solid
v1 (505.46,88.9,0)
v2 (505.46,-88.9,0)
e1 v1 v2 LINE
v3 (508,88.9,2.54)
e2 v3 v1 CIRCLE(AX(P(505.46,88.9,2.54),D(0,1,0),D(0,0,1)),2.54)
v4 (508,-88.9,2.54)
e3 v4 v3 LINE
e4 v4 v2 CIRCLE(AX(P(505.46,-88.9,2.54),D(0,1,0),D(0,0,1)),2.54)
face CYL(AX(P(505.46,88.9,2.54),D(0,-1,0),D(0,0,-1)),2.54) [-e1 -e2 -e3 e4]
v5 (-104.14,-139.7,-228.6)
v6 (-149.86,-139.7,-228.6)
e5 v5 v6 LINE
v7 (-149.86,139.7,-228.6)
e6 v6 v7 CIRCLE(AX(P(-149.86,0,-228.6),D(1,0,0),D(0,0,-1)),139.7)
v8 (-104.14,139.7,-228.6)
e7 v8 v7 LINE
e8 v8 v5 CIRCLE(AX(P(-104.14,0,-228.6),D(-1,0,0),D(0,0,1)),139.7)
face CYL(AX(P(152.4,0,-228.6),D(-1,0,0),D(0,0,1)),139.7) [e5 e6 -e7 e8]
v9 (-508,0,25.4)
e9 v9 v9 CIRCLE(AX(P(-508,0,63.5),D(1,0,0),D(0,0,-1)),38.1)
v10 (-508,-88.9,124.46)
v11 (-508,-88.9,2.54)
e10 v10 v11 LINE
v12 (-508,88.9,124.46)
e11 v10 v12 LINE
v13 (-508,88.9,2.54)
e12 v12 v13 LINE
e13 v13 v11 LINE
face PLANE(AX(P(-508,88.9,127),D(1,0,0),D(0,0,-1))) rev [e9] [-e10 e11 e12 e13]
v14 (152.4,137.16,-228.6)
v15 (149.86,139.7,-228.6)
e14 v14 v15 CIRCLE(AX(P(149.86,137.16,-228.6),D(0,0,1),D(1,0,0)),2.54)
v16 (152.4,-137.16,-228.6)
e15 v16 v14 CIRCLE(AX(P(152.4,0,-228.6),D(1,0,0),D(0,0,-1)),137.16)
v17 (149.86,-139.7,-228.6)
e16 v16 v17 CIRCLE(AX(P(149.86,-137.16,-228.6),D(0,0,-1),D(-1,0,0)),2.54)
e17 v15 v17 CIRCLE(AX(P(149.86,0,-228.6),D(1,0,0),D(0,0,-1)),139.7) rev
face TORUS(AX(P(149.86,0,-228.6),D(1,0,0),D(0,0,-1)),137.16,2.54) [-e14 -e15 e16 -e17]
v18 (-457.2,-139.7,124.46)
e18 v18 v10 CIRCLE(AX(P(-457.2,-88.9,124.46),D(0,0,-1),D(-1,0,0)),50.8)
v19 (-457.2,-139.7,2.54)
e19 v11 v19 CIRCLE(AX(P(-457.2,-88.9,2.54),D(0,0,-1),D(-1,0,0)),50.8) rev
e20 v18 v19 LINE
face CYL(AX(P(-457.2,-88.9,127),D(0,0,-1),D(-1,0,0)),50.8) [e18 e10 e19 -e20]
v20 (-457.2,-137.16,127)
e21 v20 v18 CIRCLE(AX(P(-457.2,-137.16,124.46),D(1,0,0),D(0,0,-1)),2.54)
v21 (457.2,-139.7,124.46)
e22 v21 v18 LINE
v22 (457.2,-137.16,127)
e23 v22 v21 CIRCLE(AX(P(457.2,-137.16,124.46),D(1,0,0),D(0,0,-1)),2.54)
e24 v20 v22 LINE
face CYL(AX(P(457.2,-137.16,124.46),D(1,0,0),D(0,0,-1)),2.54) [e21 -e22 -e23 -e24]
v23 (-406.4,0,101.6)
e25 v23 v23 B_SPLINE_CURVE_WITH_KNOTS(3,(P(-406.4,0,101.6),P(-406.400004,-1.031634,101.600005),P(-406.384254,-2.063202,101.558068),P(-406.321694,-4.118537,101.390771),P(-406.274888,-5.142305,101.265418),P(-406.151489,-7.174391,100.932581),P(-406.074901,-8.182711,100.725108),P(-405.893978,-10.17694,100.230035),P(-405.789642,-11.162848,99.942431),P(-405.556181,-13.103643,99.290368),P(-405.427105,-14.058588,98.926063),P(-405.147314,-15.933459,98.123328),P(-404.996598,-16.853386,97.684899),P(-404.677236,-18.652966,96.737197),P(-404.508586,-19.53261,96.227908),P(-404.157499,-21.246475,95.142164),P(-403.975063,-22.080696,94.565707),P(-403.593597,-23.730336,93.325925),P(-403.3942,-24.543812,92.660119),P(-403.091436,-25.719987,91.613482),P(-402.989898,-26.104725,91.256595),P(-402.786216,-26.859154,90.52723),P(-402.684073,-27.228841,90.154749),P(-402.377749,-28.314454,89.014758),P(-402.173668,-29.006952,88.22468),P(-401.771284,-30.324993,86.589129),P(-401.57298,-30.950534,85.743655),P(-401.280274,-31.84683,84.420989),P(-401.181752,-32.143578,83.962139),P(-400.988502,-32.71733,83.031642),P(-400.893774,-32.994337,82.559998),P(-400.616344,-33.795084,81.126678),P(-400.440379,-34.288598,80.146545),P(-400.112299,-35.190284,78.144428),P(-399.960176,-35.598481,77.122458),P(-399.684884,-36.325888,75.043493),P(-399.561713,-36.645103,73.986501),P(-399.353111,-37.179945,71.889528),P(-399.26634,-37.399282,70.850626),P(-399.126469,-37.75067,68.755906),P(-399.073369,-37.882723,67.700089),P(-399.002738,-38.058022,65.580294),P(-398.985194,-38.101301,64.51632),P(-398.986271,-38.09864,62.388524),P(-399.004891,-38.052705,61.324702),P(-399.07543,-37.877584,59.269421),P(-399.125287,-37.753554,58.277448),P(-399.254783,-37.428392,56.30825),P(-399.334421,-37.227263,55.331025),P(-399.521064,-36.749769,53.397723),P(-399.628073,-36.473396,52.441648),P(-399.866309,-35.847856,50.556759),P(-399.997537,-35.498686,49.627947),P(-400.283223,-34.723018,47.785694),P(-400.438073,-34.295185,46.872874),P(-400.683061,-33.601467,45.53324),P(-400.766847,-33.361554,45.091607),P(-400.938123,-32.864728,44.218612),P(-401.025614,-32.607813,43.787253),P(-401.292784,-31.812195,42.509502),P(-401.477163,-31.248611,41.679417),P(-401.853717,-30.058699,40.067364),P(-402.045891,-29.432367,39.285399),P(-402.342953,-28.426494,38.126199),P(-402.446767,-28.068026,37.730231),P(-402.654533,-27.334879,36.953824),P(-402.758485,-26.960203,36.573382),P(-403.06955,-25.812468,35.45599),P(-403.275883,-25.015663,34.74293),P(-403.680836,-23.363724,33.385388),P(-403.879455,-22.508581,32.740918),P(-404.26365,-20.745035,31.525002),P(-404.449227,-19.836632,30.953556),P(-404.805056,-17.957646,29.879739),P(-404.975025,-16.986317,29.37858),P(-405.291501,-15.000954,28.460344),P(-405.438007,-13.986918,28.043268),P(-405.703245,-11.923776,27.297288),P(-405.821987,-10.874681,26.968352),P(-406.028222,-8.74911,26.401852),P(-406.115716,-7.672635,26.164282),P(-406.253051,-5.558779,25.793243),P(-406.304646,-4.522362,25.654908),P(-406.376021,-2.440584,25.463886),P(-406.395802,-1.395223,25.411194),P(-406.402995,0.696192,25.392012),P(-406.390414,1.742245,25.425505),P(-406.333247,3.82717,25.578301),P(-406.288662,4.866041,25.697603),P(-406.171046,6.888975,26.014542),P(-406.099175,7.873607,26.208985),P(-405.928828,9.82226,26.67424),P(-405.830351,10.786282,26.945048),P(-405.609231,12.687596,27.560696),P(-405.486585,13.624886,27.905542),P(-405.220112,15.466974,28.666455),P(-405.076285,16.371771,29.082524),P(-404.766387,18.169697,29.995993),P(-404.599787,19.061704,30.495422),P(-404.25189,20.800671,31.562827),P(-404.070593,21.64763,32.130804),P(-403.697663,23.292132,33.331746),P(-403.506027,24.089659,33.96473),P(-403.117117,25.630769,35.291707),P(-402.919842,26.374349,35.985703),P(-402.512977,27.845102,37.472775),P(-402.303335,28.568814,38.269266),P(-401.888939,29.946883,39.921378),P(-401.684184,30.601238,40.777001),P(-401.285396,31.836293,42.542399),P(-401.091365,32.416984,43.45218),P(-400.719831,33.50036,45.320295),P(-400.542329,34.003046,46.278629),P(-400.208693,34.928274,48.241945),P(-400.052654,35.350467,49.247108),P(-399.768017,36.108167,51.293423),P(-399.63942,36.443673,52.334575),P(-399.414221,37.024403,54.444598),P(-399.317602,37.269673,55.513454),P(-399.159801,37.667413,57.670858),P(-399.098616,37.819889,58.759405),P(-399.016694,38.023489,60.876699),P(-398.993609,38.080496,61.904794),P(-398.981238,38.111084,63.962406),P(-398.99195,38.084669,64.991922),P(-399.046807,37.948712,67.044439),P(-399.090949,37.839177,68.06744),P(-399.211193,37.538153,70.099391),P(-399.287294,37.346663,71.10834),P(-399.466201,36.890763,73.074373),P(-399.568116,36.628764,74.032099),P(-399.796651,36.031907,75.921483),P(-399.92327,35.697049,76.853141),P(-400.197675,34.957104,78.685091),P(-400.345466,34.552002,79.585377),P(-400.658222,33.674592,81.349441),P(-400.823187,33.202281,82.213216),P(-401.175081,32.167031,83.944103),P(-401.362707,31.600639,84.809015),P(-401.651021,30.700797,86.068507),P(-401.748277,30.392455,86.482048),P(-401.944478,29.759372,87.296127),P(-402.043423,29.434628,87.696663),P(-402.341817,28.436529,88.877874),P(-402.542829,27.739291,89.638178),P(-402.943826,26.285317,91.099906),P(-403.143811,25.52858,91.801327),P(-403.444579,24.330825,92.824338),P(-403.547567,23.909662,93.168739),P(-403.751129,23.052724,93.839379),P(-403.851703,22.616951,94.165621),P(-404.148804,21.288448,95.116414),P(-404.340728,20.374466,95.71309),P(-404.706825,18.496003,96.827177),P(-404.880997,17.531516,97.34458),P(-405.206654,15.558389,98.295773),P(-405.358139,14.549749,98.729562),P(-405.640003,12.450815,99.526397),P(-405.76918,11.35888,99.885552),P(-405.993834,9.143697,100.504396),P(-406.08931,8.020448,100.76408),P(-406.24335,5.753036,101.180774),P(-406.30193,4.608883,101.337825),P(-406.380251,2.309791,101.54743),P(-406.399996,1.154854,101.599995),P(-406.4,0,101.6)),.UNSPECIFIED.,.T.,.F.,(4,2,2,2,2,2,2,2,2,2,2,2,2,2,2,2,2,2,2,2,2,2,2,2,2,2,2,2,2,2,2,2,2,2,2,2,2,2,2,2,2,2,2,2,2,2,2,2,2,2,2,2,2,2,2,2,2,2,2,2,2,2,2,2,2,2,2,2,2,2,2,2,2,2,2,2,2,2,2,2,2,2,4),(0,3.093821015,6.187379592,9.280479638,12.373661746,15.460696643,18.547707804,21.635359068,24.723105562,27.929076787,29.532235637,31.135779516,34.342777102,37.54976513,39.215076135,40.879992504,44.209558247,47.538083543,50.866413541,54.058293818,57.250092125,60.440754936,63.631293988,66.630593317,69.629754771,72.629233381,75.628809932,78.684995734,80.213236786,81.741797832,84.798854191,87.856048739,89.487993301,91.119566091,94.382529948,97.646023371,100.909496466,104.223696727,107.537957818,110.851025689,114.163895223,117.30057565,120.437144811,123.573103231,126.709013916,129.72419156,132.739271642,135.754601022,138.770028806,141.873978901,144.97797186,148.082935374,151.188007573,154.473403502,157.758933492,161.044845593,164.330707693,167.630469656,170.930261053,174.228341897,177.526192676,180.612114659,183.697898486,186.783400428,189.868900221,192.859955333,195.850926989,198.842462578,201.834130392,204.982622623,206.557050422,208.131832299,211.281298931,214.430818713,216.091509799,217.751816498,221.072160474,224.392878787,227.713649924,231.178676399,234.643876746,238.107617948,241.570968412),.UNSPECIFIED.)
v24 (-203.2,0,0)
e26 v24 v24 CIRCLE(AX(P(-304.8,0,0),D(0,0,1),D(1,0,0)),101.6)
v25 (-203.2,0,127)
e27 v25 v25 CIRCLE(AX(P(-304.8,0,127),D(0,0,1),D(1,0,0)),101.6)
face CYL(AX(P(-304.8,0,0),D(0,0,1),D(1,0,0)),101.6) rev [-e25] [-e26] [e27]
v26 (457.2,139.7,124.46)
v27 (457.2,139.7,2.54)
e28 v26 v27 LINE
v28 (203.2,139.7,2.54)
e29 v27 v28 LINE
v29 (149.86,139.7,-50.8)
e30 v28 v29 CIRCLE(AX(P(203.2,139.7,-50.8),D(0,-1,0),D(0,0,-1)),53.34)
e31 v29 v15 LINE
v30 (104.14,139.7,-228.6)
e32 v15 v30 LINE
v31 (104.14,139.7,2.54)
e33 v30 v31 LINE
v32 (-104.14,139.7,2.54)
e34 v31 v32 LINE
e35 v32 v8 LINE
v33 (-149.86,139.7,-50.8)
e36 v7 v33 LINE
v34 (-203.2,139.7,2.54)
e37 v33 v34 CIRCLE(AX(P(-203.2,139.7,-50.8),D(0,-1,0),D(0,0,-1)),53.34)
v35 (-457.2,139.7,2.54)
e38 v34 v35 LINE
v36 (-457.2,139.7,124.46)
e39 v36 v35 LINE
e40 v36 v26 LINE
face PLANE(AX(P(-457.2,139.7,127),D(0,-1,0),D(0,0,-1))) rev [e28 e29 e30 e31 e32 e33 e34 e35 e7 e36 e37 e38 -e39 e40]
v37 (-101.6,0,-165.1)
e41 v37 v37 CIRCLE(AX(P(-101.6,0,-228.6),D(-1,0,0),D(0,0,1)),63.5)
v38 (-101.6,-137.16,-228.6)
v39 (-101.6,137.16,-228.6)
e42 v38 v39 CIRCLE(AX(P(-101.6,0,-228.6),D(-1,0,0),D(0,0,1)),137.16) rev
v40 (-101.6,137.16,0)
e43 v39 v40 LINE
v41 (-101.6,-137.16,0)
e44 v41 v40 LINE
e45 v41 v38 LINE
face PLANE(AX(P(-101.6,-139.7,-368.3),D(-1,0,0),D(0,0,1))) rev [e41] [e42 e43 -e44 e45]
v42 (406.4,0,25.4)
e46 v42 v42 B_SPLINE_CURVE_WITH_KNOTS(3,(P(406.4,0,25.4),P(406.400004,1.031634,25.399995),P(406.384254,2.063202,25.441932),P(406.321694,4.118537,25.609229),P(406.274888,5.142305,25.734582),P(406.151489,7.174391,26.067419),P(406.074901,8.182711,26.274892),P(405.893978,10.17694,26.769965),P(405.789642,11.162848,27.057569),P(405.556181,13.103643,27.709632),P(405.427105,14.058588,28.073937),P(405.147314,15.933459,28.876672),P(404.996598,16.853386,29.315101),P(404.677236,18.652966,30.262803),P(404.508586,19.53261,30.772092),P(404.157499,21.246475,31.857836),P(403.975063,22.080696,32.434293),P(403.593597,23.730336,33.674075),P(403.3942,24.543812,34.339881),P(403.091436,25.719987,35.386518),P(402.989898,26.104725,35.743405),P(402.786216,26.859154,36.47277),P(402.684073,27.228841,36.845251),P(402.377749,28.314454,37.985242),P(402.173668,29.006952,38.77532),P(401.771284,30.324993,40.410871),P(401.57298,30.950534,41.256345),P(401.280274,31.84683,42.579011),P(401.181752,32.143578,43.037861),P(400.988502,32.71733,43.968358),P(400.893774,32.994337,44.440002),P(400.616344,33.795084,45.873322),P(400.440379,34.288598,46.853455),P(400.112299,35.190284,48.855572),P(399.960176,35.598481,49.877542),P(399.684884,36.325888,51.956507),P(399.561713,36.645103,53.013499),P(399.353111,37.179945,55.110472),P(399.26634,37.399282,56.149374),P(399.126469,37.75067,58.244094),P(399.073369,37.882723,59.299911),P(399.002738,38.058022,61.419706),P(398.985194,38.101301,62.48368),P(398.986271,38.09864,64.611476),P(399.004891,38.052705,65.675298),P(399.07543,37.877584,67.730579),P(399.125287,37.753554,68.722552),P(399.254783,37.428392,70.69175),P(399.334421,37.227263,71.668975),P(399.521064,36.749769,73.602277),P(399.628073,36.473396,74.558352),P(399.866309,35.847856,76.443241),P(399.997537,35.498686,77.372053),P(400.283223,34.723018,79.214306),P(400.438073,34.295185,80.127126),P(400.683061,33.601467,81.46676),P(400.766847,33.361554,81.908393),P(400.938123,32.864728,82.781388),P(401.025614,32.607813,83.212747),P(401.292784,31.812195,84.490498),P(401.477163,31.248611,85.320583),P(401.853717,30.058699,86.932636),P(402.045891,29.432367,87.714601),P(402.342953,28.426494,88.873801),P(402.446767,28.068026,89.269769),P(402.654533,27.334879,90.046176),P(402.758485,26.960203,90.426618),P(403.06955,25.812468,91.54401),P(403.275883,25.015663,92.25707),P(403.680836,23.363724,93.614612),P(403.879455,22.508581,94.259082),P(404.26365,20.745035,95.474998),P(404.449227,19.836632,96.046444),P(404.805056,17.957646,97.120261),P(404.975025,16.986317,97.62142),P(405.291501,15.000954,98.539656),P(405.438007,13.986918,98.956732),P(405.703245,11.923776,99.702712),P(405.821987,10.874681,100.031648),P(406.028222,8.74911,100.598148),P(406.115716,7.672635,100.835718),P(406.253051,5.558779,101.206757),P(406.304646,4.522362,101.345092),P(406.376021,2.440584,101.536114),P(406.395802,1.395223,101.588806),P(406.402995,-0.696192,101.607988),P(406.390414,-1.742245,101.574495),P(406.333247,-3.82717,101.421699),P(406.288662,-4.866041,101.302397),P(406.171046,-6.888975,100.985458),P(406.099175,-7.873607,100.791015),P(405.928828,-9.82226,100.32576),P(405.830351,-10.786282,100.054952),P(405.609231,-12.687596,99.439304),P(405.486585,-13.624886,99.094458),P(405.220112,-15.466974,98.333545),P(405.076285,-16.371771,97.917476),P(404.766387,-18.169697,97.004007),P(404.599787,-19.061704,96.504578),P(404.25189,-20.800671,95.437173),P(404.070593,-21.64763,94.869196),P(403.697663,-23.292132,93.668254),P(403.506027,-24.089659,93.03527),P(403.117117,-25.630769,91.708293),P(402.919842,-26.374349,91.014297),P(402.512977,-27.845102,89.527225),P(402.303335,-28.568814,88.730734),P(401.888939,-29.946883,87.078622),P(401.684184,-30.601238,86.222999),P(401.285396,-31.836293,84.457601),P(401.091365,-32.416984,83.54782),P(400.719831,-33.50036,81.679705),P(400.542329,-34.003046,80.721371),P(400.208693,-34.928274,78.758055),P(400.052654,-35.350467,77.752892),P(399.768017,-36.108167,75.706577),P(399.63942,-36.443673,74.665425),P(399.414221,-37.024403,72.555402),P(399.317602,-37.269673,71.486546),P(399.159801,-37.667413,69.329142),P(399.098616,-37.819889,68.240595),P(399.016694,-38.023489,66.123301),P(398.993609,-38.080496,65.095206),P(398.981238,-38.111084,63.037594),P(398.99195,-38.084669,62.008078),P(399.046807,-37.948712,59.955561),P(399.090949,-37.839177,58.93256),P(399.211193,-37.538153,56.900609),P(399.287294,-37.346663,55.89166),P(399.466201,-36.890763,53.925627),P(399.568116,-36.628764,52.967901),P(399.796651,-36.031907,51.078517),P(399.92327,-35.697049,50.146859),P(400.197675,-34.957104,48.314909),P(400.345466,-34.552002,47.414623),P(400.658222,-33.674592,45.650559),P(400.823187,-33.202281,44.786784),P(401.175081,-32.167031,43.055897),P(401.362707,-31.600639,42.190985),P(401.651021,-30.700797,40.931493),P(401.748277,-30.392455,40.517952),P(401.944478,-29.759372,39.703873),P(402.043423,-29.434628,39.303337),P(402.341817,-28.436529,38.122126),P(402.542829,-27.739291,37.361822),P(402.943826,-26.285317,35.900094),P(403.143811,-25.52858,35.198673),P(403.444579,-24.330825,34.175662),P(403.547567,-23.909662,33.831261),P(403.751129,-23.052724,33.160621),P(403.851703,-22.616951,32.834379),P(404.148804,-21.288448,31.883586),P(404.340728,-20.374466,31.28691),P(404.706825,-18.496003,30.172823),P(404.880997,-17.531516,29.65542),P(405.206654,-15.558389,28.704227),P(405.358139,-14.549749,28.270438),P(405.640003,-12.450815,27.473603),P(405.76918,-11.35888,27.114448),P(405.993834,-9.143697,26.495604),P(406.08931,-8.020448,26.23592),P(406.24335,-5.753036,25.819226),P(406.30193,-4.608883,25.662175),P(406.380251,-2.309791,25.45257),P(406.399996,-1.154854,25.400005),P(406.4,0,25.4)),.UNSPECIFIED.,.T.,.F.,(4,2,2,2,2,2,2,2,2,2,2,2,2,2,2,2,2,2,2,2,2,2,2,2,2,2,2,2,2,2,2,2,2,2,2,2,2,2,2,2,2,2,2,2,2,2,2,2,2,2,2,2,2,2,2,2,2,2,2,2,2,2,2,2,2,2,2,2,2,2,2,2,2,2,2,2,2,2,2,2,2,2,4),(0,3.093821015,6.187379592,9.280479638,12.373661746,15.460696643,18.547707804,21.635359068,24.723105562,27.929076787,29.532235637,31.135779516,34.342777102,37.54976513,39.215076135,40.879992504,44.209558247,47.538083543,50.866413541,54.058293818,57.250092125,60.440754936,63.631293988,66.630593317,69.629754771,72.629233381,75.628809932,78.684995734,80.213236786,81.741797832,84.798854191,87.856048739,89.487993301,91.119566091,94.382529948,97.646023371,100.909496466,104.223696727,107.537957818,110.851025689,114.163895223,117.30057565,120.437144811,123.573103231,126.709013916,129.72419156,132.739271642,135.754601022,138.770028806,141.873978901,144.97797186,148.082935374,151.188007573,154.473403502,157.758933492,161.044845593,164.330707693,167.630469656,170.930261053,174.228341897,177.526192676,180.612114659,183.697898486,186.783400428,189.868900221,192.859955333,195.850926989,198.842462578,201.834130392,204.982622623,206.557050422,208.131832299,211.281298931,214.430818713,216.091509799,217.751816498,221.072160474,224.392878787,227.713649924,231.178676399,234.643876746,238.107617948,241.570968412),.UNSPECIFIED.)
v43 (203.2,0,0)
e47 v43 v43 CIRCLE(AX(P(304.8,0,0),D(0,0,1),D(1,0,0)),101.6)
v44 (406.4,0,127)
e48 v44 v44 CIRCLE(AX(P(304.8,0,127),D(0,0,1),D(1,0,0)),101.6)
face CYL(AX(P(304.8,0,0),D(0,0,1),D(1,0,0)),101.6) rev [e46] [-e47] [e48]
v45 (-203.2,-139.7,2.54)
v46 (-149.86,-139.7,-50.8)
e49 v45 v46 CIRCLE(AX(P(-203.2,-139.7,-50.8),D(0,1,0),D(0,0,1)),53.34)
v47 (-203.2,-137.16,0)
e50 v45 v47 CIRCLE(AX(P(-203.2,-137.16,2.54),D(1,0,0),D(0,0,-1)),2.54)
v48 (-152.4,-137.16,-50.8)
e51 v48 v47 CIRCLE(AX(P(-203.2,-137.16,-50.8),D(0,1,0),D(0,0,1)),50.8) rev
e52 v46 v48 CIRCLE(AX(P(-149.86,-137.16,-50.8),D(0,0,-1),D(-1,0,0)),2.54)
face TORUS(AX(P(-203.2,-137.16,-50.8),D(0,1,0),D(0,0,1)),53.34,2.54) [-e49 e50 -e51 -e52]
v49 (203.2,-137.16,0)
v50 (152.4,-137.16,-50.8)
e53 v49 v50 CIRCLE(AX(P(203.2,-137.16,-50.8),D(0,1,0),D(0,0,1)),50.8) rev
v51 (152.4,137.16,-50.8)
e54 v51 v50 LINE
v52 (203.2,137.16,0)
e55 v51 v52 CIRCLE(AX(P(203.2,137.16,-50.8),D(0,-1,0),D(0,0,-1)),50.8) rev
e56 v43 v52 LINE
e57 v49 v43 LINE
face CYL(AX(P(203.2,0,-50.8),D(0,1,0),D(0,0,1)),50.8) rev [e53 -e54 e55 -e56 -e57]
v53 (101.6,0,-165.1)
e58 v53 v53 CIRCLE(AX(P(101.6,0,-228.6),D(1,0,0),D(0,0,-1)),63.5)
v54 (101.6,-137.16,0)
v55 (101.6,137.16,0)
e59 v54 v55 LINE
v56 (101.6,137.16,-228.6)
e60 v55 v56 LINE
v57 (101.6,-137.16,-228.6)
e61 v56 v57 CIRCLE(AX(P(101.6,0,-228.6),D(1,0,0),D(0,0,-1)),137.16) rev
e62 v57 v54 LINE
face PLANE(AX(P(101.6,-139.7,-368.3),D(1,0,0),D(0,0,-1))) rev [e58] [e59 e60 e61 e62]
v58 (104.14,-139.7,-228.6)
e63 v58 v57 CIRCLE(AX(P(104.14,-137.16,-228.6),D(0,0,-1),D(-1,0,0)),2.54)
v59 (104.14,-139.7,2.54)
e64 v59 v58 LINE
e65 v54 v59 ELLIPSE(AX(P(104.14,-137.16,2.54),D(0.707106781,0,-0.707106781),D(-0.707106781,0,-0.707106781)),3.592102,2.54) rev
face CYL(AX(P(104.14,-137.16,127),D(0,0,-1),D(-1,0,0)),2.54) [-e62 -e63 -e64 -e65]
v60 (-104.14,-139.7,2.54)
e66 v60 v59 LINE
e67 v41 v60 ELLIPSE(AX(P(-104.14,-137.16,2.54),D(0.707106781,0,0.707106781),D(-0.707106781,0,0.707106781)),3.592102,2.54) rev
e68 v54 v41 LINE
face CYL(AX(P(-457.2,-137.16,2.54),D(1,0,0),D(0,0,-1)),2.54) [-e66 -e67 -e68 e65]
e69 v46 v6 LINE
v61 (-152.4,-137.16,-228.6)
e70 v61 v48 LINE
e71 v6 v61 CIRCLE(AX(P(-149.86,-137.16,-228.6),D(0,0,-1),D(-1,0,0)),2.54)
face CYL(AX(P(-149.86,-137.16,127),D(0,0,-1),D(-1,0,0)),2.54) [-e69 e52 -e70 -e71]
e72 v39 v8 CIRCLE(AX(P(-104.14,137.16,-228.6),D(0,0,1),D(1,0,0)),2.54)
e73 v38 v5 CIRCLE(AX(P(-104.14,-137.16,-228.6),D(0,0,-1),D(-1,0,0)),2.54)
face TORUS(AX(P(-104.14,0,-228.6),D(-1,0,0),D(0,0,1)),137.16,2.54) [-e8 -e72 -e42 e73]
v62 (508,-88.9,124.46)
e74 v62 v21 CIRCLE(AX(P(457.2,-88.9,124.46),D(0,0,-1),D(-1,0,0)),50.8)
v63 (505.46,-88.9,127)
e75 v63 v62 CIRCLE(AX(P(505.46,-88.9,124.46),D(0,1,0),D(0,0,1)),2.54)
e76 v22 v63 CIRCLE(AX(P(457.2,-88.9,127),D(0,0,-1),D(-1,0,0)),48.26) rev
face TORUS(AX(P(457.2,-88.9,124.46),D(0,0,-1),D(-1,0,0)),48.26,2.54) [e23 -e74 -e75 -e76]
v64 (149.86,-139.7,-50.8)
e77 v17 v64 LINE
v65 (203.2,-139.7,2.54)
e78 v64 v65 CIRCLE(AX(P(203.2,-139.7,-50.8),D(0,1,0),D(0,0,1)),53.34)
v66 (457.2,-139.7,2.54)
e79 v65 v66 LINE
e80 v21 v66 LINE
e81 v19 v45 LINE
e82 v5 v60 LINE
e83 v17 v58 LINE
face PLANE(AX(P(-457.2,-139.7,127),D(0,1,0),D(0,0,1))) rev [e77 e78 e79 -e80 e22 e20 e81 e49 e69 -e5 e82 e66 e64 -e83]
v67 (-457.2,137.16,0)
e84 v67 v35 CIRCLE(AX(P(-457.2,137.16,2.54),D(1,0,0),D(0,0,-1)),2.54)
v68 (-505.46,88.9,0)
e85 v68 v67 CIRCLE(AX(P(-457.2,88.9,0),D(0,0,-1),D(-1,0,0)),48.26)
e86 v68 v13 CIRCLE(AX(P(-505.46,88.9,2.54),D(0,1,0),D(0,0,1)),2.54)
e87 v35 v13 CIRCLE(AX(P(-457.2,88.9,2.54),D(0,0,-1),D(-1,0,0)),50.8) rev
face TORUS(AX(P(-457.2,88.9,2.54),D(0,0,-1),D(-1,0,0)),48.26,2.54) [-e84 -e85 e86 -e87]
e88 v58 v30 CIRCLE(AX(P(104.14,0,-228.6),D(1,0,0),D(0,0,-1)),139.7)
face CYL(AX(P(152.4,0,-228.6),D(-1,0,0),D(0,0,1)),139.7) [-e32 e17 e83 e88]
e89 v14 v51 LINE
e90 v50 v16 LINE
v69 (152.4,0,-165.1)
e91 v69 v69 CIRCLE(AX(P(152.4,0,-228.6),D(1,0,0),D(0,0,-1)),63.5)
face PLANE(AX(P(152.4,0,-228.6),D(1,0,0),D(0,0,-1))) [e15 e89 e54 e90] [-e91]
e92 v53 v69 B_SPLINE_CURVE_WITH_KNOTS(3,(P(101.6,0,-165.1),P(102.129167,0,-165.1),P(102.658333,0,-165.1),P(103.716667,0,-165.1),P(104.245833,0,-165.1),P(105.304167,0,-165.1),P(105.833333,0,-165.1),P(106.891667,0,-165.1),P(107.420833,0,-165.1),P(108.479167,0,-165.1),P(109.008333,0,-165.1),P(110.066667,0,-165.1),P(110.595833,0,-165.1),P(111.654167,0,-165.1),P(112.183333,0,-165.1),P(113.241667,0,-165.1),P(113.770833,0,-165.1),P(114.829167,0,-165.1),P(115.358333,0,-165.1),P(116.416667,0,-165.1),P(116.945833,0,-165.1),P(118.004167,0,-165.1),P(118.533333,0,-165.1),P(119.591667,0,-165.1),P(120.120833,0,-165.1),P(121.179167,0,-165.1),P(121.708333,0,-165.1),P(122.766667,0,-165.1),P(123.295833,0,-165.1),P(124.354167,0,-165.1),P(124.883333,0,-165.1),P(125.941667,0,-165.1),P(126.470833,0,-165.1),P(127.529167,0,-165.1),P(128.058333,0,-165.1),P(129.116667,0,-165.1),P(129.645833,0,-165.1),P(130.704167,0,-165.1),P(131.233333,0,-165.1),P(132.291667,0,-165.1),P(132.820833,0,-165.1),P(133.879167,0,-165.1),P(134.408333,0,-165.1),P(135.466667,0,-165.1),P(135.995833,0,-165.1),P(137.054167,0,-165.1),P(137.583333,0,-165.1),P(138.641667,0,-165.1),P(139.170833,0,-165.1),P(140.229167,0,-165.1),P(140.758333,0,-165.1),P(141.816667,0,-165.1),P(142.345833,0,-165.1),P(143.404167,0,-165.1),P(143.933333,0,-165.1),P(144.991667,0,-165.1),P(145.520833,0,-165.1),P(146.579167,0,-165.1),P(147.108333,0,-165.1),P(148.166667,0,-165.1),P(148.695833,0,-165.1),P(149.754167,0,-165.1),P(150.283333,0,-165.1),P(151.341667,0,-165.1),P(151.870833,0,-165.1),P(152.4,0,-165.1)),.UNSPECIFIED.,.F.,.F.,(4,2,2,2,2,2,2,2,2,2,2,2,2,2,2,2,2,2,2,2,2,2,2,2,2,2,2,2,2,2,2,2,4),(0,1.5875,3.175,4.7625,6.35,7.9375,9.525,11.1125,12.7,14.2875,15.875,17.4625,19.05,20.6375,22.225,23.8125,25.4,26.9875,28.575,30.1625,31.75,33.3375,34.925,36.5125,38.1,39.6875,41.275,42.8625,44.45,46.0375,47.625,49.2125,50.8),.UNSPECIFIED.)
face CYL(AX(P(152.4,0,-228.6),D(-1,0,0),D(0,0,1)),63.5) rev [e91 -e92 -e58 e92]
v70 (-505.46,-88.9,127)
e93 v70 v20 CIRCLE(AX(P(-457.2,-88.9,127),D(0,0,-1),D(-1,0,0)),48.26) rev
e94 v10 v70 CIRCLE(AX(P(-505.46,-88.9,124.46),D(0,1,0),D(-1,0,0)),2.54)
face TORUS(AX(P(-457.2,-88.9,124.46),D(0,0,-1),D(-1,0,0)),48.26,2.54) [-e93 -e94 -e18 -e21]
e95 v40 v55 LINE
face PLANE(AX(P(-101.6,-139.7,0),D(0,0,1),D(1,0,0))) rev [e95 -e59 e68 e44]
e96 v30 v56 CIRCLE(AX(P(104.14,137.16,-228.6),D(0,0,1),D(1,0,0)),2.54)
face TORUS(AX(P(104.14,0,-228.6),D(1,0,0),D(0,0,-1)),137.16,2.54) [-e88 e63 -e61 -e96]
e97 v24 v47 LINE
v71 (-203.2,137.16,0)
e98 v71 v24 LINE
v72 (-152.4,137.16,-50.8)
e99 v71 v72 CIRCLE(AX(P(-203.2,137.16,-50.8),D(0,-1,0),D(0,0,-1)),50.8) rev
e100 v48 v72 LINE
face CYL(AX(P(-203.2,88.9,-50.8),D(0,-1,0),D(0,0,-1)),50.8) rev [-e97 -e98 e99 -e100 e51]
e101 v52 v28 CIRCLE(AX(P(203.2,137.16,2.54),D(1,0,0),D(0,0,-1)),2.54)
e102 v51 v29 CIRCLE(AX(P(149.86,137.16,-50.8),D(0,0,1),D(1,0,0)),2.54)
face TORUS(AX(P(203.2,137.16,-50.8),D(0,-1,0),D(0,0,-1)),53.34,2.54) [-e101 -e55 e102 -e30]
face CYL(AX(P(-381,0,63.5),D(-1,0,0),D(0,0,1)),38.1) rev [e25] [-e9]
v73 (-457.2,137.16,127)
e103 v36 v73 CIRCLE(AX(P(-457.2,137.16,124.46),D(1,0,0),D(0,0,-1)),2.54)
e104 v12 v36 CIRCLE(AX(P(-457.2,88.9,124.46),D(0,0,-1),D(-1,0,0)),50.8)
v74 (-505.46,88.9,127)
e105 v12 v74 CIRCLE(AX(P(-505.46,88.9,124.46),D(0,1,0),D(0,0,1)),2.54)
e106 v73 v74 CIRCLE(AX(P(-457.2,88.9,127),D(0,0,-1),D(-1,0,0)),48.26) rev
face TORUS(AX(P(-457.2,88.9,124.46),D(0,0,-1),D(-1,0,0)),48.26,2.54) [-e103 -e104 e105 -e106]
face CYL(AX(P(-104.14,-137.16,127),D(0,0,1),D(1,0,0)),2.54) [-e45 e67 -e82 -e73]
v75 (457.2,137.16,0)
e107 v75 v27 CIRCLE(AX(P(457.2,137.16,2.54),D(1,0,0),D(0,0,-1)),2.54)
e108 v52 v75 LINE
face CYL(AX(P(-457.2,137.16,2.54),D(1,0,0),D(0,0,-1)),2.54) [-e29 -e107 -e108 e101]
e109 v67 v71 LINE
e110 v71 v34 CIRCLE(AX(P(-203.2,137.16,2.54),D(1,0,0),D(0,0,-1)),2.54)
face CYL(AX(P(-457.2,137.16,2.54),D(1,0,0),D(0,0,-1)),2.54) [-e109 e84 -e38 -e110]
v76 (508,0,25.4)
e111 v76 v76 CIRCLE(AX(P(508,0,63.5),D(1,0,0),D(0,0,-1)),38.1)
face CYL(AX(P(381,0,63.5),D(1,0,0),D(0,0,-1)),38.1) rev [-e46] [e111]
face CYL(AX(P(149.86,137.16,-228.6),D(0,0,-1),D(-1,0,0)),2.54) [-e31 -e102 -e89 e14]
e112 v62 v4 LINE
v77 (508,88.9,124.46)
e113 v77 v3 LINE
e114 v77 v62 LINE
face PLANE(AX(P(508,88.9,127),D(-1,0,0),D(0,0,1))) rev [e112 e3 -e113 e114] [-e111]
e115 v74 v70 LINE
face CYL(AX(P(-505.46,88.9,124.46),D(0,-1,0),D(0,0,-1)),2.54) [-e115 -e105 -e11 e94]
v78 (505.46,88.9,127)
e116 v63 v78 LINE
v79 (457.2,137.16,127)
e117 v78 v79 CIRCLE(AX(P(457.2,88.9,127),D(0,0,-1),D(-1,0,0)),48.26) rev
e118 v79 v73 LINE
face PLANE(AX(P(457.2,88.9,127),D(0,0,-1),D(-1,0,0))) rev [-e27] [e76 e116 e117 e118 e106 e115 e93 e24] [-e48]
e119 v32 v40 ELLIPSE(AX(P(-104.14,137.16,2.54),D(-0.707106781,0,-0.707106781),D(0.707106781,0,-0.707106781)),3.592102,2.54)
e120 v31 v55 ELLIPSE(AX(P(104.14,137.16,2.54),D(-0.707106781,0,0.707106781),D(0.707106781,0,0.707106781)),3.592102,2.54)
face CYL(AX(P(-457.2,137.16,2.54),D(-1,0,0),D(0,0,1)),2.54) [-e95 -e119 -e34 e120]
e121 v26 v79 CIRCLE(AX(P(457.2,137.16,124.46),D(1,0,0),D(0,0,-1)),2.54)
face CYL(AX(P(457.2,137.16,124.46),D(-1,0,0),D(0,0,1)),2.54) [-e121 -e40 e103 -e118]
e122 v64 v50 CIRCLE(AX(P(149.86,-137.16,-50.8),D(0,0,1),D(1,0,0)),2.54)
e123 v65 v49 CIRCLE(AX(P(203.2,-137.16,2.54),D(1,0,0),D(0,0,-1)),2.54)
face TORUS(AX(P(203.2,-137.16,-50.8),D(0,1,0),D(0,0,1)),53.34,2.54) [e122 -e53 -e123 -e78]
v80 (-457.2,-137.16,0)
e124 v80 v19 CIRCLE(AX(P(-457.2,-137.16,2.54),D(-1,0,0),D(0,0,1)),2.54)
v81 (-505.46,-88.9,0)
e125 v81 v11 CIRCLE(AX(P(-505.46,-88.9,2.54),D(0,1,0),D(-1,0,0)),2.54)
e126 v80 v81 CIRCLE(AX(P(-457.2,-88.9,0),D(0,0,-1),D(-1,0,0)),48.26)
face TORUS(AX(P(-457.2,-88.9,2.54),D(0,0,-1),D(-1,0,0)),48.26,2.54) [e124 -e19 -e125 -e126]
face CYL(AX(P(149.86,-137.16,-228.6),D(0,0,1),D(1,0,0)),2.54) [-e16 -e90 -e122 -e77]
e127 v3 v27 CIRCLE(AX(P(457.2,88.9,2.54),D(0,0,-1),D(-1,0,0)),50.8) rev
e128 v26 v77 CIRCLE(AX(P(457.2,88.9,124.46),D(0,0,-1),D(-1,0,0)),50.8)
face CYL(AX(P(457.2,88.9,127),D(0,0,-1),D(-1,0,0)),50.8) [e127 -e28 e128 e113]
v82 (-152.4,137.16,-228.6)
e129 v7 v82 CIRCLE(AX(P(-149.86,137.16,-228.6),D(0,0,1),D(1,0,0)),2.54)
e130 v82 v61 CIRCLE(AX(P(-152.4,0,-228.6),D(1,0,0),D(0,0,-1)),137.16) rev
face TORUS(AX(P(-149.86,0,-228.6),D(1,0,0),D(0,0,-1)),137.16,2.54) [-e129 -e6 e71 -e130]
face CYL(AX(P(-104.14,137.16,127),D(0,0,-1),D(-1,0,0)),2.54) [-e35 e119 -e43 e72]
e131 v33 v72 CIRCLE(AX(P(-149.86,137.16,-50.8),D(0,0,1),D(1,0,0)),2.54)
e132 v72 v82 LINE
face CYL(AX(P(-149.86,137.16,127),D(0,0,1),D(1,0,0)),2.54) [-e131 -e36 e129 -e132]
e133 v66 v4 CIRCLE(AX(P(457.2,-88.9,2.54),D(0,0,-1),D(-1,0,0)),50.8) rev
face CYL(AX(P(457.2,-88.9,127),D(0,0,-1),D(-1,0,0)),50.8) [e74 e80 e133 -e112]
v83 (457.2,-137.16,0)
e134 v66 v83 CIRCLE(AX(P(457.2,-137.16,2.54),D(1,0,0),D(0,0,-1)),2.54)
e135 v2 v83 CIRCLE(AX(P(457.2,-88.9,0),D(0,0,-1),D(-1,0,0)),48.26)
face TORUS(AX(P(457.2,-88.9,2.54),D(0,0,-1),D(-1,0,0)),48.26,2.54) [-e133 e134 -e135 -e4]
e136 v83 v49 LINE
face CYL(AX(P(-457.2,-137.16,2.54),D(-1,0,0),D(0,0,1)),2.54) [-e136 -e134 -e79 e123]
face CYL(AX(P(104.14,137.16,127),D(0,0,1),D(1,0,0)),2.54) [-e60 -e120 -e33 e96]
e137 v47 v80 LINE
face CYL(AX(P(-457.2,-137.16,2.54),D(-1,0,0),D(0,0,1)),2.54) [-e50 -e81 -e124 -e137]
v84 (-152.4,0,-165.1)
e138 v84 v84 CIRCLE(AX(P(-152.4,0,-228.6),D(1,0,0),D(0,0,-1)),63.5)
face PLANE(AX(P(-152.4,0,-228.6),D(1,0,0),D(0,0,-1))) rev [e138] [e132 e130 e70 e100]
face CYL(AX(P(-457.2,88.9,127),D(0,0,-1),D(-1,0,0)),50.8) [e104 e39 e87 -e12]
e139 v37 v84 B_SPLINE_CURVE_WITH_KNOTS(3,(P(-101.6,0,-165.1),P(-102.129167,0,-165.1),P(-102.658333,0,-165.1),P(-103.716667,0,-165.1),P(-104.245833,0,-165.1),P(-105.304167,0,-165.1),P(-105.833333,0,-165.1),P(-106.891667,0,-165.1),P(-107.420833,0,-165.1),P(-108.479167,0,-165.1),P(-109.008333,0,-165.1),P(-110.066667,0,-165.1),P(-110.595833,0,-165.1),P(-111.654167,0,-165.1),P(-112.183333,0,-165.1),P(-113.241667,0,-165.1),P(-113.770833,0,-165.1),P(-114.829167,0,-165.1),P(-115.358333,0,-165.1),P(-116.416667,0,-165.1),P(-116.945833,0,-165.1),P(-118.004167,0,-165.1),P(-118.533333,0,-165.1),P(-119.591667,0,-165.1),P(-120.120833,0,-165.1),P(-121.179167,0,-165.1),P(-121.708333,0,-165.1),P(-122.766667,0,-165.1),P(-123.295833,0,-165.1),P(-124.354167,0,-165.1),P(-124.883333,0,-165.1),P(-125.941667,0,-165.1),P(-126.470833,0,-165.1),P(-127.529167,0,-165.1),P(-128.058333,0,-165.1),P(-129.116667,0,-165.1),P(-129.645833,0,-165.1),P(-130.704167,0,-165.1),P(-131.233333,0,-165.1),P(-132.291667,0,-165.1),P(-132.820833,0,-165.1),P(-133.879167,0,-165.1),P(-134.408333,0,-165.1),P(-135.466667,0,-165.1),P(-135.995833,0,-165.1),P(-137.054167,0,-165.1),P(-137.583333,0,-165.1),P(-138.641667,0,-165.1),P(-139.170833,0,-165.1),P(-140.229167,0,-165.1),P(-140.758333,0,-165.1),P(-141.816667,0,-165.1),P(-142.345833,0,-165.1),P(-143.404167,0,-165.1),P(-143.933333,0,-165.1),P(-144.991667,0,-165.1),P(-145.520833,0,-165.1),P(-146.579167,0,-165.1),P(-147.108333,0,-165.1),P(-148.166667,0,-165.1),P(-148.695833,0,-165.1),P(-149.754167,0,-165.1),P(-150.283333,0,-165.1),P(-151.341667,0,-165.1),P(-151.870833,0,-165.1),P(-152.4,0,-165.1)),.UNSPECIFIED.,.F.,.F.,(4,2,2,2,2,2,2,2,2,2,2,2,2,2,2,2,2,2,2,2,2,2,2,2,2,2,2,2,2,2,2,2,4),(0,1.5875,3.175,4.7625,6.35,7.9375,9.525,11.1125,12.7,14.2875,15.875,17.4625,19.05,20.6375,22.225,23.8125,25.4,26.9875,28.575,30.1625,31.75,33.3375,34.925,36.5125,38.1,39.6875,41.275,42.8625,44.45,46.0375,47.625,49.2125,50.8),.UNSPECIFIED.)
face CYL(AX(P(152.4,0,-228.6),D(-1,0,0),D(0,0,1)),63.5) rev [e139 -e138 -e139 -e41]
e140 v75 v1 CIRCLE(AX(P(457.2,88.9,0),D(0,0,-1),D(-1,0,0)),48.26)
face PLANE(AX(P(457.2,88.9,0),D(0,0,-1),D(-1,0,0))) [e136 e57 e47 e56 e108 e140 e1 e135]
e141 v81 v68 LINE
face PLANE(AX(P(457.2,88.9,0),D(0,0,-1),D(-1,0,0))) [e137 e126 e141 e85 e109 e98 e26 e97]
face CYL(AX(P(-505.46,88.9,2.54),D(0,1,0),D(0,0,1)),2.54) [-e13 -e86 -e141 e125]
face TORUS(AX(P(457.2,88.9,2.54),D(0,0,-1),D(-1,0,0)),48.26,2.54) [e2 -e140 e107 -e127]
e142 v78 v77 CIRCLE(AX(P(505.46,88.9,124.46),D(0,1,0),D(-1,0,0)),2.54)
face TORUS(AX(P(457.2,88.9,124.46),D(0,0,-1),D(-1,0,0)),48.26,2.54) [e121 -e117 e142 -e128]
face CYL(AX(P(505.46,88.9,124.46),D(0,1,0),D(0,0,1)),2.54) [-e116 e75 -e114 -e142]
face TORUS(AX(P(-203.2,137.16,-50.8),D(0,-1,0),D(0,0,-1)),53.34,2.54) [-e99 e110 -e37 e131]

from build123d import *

# Parameters (mm, degrees)
BOSS_EXTRUDE1_DEPTH     = 127
SKETCH2_R               = 101.6
CUT_EXTRUDE1_DEPTH      = 127
SKETCH3_R               = 38.1
CUT_EXTRUDE2_DEPTH      = 127
SKETCH9_R               = 63.5
BOSS_EXTRUDE2_DEPTH     = 152.4
CUT_EXTRUDE3_DEPTH      = 687.85751805
CUT_EXTRUDE3_DEPTH_BACK = 687.85751805
SKETCH11_W              = 203.2
SKETCH11_H              = 368.3
FILLET1_R               = 50.8
FILLET2_R               = 2.54


with BuildPart() as part:
    # Sketch1 → Boss-Extrude1 (new body)
    with BuildSketch(Plane.XY):
        with BuildLine():
            Line((-457.2, 139.7), (457.2, 139.7))
            ThreePointArc((457.2, 139.7), (493.121024484, 124.821024484), (508, 88.9))
            Line((508, 88.9), (508, -88.9))
            ThreePointArc((508, -88.9), (493.121024484, -124.821024484), (457.2, -139.7))
            Line((457.2, -139.7), (-457.2, -139.7))
            ThreePointArc((-457.2, -139.7), (-493.121024484, -124.821024484), (-508, -88.9))
            Line((-508, -88.9), (-508, 88.9))
            ThreePointArc((-508, 88.9), (-493.121024484, 124.821024484), (-457.2, 139.7))
        make_face()
    extrude(amount=BOSS_EXTRUDE1_DEPTH)

    # Sketch2 → Cut-Extrude1 (cut)
    with BuildSketch(Plane.XY.offset(127)):
        with Locations((-304.8, 0)):
            Circle(SKETCH2_R)
        with Locations((304.8, 0)):
            Circle(SKETCH2_R)
    extrude(amount=-CUT_EXTRUDE1_DEPTH, mode=Mode.SUBTRACT)

    # Sketch3 → Cut-Extrude2 (cut)
    with BuildSketch(Plane(origin=(508, 0, 0), x_dir=(0, 0, -1), z_dir=(1, 0, 0))):
        with Locations((-63.5, 0)):
            Circle(SKETCH3_R)
    cut_extrude2 = extrude(amount=-CUT_EXTRUDE2_DEPTH, mode=Mode.SUBTRACT)

    # Mirror1: Cut-Extrude2 across plane
    add(cut_extrude2.mirror(Plane(origin=(0, 0, 0), x_dir=(0, 0, 1), z_dir=(1, 0, 0))), mode=Mode.SUBTRACT)

    # Sketch9 → Boss-Extrude2 (add, symmetric)
    with BuildSketch(Plane(origin=(0, 0, 0), x_dir=(0, 0, -1), z_dir=(1, 0, 0))):
        with BuildLine():
            Line((0, -88.9), (0, 88.9))
            Line((0, 88.9), (0, 139.7))
            Line((0, 139.7), (228.6, 139.7))
            ThreePointArc((228.6, 139.7), (368.3, 0), (228.6, -139.7))
            Line((228.6, -139.7), (0, -139.7))
            Line((0, -139.7), (0, -88.9))
        make_face()
        with Locations(Location((228.6, 0, 0), (0, 0, 180))):
            Circle(SKETCH9_R, mode=Mode.SUBTRACT)
    extrude(amount=BOSS_EXTRUDE2_DEPTH, both=True)

    # Sketch11 → Cut-Extrude3 (cut, two sides: drawn at the far end of the back side and taken through both)
    with BuildSketch(Plane(origin=(0, 139.7, 0), x_dir=(1, 0, 0), z_dir=(0, 1, 0)).offset(-CUT_EXTRUDE3_DEPTH_BACK)):
        with Locations((0, 184.15)):
            Rectangle(SKETCH11_W, SKETCH11_H)
    extrude(amount=CUT_EXTRUDE3_DEPTH + CUT_EXTRUDE3_DEPTH_BACK, mode=Mode.SUBTRACT)

    # Fillet1
    fillet1_edges = [part.edges().sort_by_distance(p)[0] for p in [
        (152.4, 0, 0),
        (-152.4, 0, 0),
    ]]
    fillet(fillet1_edges, radius=FILLET1_R - 0.0001)  # a hair under: the kernel refuses the full size

    # Fillet2
    fillet2_edges = [part.edges().sort_by_distance(p)[0] for p in [
        (-508, 0, 0),
        (-493.121024484, 124.821024484, 0),
        (330.19995, 139.7, 0),
        (493.121024484, 124.821024484, 0),
        (-493.121024484, 124.821024484, 127),
        (-508, 0, 127),
        (-493.121024484, -124.821024484, 127),
        (0, -139.7, 127),
        (493.121024484, -124.821024484, 127),
        (508, 0, 127),
        (152.4, 0, -368.3),
        (152.4, 139.7, -139.69995),
        (-152.4, 0, -368.3),
        (-152.4, 139.7, -139.69995),
        (493.121024484, 124.821024484, 127),
        (0, 139.7, 0),
        (0, -139.7, 0),
        (-101.6, 139.7, -114.3),
        (-101.6, 0, -368.3),
        (-101.6, -139.7, -114.3),
        (101.6, 0, -368.3),
        (101.6, 139.7, -114.3),
        (101.6, -139.7, -114.3),
        (508, 0, 0),
        (152.4, -139.7, -139.69995),
        (330.19995, -139.7, 0),
        (-330.19995, 139.7, 0),
        (0, 139.7, 127),
        (493.121024484, -124.821024484, 0),
        (-152.4, -139.7, -139.69995),
        (167.278946226, -139.7, -14.878946226),
        (167.278946226, 139.7, -14.878946226),
        (-167.278946226, -139.7, -14.878946226),
        (-167.278946226, 139.7, -14.878946226),
        (-330.19995, -139.7, 0),
        (-493.121024484, -124.821024484, 0),
    ]]
    fillet(fillet2_edges, radius=FILLET2_R)


solid = part.part
